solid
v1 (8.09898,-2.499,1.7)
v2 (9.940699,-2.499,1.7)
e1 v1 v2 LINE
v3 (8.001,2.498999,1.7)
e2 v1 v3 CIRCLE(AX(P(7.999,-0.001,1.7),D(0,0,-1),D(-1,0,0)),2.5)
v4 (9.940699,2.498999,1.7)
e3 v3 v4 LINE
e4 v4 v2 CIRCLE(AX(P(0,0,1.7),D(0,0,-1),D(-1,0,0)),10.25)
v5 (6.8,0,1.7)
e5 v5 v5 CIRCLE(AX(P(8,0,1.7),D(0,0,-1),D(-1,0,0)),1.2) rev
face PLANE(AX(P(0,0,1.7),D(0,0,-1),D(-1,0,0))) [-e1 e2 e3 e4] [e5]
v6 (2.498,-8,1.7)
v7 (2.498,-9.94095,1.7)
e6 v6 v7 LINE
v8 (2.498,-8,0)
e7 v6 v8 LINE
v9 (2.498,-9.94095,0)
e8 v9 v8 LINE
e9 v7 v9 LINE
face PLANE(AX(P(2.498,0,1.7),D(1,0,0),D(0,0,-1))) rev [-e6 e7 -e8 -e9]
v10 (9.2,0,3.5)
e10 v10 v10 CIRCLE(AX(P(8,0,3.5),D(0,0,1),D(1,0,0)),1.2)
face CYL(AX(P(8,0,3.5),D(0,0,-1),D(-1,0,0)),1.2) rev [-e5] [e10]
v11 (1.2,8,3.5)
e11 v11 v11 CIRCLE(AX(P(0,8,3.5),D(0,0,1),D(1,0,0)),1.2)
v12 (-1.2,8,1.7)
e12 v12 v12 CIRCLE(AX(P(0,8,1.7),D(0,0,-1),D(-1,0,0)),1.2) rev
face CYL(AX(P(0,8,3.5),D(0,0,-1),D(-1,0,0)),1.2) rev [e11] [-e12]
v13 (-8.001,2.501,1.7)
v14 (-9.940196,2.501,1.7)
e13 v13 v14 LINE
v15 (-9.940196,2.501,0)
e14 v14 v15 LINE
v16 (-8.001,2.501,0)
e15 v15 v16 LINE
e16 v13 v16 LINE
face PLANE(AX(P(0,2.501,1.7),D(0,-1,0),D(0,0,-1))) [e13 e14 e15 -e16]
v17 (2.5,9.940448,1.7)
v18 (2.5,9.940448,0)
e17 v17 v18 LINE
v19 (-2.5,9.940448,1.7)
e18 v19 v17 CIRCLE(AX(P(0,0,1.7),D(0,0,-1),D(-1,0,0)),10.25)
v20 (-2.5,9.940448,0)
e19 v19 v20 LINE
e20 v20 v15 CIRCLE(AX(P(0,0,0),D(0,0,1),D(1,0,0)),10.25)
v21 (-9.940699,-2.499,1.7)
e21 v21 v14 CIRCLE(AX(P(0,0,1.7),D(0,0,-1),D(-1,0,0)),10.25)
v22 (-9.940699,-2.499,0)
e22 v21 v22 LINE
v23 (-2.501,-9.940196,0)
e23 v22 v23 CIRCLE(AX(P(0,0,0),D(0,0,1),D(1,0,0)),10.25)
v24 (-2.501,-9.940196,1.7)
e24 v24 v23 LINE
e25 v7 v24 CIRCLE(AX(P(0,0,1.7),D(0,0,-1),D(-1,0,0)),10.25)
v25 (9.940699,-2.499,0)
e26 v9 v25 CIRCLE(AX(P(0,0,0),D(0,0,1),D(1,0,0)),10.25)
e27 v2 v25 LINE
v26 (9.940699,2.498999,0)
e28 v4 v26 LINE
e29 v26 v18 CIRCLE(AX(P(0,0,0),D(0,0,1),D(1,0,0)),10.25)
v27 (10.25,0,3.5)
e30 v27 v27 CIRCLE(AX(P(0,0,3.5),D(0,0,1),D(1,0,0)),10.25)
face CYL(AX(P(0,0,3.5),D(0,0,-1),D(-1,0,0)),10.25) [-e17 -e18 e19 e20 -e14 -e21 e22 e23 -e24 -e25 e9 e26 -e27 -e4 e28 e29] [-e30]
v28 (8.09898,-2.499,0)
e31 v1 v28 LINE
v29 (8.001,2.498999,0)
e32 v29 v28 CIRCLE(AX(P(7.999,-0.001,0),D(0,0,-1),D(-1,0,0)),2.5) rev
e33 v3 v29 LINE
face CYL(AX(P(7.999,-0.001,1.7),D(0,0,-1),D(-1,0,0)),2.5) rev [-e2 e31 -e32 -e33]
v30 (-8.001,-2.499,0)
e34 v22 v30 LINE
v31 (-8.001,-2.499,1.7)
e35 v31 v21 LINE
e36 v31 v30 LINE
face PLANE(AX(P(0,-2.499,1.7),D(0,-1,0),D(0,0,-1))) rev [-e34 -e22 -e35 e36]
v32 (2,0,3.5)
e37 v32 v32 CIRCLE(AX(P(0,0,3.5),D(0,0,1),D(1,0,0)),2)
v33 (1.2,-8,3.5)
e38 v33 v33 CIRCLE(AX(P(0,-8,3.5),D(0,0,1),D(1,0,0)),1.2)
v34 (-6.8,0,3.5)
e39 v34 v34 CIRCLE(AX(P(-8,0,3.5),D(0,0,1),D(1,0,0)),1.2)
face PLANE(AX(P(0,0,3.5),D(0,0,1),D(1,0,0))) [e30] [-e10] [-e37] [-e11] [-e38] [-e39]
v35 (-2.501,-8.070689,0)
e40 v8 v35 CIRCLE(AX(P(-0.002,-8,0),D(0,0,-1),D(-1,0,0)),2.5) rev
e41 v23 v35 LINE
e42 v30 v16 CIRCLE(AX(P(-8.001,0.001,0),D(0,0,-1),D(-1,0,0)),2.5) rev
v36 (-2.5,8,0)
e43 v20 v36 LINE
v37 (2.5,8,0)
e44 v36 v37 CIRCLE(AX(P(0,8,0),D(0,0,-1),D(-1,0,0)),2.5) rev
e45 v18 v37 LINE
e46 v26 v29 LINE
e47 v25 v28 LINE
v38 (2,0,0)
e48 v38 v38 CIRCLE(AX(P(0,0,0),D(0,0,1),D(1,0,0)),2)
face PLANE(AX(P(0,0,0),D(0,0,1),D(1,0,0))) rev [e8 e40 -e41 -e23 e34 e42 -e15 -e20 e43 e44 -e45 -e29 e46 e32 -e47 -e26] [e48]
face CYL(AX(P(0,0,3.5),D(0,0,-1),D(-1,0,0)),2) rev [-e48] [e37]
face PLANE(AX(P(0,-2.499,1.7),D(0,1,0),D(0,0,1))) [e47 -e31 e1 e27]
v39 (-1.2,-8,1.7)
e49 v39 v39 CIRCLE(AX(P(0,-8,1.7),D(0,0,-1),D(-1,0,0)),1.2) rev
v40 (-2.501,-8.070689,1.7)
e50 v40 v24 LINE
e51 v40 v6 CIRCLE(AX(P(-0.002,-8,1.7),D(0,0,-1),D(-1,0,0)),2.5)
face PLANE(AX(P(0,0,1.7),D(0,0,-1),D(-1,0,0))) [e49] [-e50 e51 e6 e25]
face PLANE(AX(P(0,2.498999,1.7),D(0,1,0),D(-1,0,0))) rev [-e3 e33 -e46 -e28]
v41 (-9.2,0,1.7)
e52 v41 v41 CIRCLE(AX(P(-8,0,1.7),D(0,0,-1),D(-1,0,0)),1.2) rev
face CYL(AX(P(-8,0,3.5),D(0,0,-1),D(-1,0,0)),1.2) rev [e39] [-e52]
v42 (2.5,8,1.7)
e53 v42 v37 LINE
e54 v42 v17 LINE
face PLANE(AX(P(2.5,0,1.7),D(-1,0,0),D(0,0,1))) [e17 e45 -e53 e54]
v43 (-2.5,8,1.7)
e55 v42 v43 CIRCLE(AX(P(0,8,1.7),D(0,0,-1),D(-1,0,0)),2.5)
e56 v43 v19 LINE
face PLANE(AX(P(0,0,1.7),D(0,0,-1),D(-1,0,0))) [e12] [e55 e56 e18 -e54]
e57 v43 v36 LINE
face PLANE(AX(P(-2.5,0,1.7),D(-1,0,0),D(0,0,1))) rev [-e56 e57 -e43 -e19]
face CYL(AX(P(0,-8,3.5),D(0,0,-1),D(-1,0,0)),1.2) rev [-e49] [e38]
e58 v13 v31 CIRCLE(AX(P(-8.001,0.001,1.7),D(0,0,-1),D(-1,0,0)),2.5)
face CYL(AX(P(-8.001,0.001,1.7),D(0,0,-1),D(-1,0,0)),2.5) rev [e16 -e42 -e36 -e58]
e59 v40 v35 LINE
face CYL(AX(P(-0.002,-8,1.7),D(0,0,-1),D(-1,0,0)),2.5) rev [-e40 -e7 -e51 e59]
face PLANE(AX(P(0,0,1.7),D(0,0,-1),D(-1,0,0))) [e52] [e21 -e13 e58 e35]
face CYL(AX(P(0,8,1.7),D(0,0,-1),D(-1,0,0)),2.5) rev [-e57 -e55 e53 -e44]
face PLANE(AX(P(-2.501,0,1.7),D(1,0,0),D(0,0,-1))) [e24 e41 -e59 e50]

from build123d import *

# Parameters (mm, degrees)
SKETCH1_R              = 10.25
SKETCH1_R_2            = 2
SKETCH1_R_3            = 1.2
BOSS_EXTRUDE1_DEPTH    = 3.5
CUT_EXTRUDE2_START     = -1.7
CUT_EXTRUDE2_OUTLINE_R = 1.2
CUT_EXTRUDE2_DEPTH     = 1.7


# Read off the part's stored shape, not the designer's step: Cut-Extrude2
with BuildPart() as part:
    # Sketch1 → Boss-Extrude1 (new body)
    with BuildSketch(Plane.XY):
        Circle(SKETCH1_R)
        Circle(SKETCH1_R_2, mode=Mode.SUBTRACT)
        with Locations((0, 8)):
            Circle(SKETCH1_R_3, mode=Mode.SUBTRACT)
        with Locations((8, 0)):
            Circle(SKETCH1_R_3, mode=Mode.SUBTRACT)
        with Locations((0, -8)):
            Circle(SKETCH1_R_3, mode=Mode.SUBTRACT)
        with Locations((-8, 0)):
            Circle(SKETCH1_R_3, mode=Mode.SUBTRACT)
    extrude(amount=BOSS_EXTRUDE1_DEPTH)

    # Cut-Extrude2 outline → Cut-Extrude2 (cut)
    # profile 1 of 4: a face of its own
    with BuildSketch(Plane(origin=(0, 0, 0), x_dir=(-1, 0, 0), z_dir=(0, 0, -1)).offset(CUT_EXTRUDE2_START)):
        with BuildLine():
            Line((-9.94069912, -2.499), (-8.098979998, -2.499))
            ThreePointArc((-8.098979998, -2.499), (-5.49948025, -0.050000196), (-8.000999999, 2.4989992))
            Line((-8.000999999, 2.4989992), (-9.940699321, 2.4989992))
            ThreePointArc((-9.940699321, 2.4989992), (-10.25, -4.12e-07), (-9.94069912, -2.499))
        make_face()
        with Locations((-8, 0)):
            Circle(CUT_EXTRUDE2_OUTLINE_R, mode=Mode.SUBTRACT)
    # profile 2 of 4: a face of its own
    with BuildSketch(Plane(origin=(0, 0, 0), x_dir=(-1, 0, 0), z_dir=(0, 0, -1)).offset(CUT_EXTRUDE2_START)):
        with BuildLine():
            Line((-2.498, -8), (-2.498, -9.940950458))
            ThreePointArc((-2.498, -9.940950458), (0.001546691, -10.249999883), (2.501, -9.940196125))
            Line((2.501, -9.940196125), (2.5010004, -8.070689462))
            ThreePointArc((2.5010004, -8.070689462), (0.037348265, -5.500249912), (-2.498, -8))
        make_face()
        with Locations((0, -8)):
            Circle(CUT_EXTRUDE2_OUTLINE_R, mode=Mode.SUBTRACT)
    # profile 3 of 4: a face of its own
    with BuildSketch(Plane(origin=(0, 0, 0), x_dir=(-1, 0, 0), z_dir=(0, 0, -1)).offset(CUT_EXTRUDE2_START)):
        with BuildLine():
            ThreePointArc((2.5, 9.940447676), (0, 10.25), (-2.5, 9.940447676))
            Line((-2.5, 9.940447676), (-2.5, 8))
            ThreePointArc((-2.5, 8), (0, 5.5), (2.5, 8))
            Line((2.5, 8), (2.5, 9.940447676))
        make_face()
        with Locations((0, 8)):
            Circle(CUT_EXTRUDE2_OUTLINE_R, mode=Mode.SUBTRACT)
    # profile 4 of 4: a face of its own
    with BuildSketch(Plane(origin=(0, 0, 0), x_dir=(-1, 0, 0), z_dir=(0, 0, -1)).offset(CUT_EXTRUDE2_START)):
        with BuildLine():
            Line((8.001, -2.499), (9.94069912, -2.499))
            ThreePointArc((9.94069912, -2.499), (10.249999948, 0.001031141), (9.940196125, 2.501))
            Line((9.940196125, 2.501), (8.001, 2.501))
            ThreePointArc((8.001, 2.501), (5.501, 0.001), (8.001, -2.499))
        make_face()
        with Locations((8, 0)):
            Circle(CUT_EXTRUDE2_OUTLINE_R, mode=Mode.SUBTRACT)
    extrude(amount=CUT_EXTRUDE2_DEPTH, mode=Mode.SUBTRACT)


solid = part.part
